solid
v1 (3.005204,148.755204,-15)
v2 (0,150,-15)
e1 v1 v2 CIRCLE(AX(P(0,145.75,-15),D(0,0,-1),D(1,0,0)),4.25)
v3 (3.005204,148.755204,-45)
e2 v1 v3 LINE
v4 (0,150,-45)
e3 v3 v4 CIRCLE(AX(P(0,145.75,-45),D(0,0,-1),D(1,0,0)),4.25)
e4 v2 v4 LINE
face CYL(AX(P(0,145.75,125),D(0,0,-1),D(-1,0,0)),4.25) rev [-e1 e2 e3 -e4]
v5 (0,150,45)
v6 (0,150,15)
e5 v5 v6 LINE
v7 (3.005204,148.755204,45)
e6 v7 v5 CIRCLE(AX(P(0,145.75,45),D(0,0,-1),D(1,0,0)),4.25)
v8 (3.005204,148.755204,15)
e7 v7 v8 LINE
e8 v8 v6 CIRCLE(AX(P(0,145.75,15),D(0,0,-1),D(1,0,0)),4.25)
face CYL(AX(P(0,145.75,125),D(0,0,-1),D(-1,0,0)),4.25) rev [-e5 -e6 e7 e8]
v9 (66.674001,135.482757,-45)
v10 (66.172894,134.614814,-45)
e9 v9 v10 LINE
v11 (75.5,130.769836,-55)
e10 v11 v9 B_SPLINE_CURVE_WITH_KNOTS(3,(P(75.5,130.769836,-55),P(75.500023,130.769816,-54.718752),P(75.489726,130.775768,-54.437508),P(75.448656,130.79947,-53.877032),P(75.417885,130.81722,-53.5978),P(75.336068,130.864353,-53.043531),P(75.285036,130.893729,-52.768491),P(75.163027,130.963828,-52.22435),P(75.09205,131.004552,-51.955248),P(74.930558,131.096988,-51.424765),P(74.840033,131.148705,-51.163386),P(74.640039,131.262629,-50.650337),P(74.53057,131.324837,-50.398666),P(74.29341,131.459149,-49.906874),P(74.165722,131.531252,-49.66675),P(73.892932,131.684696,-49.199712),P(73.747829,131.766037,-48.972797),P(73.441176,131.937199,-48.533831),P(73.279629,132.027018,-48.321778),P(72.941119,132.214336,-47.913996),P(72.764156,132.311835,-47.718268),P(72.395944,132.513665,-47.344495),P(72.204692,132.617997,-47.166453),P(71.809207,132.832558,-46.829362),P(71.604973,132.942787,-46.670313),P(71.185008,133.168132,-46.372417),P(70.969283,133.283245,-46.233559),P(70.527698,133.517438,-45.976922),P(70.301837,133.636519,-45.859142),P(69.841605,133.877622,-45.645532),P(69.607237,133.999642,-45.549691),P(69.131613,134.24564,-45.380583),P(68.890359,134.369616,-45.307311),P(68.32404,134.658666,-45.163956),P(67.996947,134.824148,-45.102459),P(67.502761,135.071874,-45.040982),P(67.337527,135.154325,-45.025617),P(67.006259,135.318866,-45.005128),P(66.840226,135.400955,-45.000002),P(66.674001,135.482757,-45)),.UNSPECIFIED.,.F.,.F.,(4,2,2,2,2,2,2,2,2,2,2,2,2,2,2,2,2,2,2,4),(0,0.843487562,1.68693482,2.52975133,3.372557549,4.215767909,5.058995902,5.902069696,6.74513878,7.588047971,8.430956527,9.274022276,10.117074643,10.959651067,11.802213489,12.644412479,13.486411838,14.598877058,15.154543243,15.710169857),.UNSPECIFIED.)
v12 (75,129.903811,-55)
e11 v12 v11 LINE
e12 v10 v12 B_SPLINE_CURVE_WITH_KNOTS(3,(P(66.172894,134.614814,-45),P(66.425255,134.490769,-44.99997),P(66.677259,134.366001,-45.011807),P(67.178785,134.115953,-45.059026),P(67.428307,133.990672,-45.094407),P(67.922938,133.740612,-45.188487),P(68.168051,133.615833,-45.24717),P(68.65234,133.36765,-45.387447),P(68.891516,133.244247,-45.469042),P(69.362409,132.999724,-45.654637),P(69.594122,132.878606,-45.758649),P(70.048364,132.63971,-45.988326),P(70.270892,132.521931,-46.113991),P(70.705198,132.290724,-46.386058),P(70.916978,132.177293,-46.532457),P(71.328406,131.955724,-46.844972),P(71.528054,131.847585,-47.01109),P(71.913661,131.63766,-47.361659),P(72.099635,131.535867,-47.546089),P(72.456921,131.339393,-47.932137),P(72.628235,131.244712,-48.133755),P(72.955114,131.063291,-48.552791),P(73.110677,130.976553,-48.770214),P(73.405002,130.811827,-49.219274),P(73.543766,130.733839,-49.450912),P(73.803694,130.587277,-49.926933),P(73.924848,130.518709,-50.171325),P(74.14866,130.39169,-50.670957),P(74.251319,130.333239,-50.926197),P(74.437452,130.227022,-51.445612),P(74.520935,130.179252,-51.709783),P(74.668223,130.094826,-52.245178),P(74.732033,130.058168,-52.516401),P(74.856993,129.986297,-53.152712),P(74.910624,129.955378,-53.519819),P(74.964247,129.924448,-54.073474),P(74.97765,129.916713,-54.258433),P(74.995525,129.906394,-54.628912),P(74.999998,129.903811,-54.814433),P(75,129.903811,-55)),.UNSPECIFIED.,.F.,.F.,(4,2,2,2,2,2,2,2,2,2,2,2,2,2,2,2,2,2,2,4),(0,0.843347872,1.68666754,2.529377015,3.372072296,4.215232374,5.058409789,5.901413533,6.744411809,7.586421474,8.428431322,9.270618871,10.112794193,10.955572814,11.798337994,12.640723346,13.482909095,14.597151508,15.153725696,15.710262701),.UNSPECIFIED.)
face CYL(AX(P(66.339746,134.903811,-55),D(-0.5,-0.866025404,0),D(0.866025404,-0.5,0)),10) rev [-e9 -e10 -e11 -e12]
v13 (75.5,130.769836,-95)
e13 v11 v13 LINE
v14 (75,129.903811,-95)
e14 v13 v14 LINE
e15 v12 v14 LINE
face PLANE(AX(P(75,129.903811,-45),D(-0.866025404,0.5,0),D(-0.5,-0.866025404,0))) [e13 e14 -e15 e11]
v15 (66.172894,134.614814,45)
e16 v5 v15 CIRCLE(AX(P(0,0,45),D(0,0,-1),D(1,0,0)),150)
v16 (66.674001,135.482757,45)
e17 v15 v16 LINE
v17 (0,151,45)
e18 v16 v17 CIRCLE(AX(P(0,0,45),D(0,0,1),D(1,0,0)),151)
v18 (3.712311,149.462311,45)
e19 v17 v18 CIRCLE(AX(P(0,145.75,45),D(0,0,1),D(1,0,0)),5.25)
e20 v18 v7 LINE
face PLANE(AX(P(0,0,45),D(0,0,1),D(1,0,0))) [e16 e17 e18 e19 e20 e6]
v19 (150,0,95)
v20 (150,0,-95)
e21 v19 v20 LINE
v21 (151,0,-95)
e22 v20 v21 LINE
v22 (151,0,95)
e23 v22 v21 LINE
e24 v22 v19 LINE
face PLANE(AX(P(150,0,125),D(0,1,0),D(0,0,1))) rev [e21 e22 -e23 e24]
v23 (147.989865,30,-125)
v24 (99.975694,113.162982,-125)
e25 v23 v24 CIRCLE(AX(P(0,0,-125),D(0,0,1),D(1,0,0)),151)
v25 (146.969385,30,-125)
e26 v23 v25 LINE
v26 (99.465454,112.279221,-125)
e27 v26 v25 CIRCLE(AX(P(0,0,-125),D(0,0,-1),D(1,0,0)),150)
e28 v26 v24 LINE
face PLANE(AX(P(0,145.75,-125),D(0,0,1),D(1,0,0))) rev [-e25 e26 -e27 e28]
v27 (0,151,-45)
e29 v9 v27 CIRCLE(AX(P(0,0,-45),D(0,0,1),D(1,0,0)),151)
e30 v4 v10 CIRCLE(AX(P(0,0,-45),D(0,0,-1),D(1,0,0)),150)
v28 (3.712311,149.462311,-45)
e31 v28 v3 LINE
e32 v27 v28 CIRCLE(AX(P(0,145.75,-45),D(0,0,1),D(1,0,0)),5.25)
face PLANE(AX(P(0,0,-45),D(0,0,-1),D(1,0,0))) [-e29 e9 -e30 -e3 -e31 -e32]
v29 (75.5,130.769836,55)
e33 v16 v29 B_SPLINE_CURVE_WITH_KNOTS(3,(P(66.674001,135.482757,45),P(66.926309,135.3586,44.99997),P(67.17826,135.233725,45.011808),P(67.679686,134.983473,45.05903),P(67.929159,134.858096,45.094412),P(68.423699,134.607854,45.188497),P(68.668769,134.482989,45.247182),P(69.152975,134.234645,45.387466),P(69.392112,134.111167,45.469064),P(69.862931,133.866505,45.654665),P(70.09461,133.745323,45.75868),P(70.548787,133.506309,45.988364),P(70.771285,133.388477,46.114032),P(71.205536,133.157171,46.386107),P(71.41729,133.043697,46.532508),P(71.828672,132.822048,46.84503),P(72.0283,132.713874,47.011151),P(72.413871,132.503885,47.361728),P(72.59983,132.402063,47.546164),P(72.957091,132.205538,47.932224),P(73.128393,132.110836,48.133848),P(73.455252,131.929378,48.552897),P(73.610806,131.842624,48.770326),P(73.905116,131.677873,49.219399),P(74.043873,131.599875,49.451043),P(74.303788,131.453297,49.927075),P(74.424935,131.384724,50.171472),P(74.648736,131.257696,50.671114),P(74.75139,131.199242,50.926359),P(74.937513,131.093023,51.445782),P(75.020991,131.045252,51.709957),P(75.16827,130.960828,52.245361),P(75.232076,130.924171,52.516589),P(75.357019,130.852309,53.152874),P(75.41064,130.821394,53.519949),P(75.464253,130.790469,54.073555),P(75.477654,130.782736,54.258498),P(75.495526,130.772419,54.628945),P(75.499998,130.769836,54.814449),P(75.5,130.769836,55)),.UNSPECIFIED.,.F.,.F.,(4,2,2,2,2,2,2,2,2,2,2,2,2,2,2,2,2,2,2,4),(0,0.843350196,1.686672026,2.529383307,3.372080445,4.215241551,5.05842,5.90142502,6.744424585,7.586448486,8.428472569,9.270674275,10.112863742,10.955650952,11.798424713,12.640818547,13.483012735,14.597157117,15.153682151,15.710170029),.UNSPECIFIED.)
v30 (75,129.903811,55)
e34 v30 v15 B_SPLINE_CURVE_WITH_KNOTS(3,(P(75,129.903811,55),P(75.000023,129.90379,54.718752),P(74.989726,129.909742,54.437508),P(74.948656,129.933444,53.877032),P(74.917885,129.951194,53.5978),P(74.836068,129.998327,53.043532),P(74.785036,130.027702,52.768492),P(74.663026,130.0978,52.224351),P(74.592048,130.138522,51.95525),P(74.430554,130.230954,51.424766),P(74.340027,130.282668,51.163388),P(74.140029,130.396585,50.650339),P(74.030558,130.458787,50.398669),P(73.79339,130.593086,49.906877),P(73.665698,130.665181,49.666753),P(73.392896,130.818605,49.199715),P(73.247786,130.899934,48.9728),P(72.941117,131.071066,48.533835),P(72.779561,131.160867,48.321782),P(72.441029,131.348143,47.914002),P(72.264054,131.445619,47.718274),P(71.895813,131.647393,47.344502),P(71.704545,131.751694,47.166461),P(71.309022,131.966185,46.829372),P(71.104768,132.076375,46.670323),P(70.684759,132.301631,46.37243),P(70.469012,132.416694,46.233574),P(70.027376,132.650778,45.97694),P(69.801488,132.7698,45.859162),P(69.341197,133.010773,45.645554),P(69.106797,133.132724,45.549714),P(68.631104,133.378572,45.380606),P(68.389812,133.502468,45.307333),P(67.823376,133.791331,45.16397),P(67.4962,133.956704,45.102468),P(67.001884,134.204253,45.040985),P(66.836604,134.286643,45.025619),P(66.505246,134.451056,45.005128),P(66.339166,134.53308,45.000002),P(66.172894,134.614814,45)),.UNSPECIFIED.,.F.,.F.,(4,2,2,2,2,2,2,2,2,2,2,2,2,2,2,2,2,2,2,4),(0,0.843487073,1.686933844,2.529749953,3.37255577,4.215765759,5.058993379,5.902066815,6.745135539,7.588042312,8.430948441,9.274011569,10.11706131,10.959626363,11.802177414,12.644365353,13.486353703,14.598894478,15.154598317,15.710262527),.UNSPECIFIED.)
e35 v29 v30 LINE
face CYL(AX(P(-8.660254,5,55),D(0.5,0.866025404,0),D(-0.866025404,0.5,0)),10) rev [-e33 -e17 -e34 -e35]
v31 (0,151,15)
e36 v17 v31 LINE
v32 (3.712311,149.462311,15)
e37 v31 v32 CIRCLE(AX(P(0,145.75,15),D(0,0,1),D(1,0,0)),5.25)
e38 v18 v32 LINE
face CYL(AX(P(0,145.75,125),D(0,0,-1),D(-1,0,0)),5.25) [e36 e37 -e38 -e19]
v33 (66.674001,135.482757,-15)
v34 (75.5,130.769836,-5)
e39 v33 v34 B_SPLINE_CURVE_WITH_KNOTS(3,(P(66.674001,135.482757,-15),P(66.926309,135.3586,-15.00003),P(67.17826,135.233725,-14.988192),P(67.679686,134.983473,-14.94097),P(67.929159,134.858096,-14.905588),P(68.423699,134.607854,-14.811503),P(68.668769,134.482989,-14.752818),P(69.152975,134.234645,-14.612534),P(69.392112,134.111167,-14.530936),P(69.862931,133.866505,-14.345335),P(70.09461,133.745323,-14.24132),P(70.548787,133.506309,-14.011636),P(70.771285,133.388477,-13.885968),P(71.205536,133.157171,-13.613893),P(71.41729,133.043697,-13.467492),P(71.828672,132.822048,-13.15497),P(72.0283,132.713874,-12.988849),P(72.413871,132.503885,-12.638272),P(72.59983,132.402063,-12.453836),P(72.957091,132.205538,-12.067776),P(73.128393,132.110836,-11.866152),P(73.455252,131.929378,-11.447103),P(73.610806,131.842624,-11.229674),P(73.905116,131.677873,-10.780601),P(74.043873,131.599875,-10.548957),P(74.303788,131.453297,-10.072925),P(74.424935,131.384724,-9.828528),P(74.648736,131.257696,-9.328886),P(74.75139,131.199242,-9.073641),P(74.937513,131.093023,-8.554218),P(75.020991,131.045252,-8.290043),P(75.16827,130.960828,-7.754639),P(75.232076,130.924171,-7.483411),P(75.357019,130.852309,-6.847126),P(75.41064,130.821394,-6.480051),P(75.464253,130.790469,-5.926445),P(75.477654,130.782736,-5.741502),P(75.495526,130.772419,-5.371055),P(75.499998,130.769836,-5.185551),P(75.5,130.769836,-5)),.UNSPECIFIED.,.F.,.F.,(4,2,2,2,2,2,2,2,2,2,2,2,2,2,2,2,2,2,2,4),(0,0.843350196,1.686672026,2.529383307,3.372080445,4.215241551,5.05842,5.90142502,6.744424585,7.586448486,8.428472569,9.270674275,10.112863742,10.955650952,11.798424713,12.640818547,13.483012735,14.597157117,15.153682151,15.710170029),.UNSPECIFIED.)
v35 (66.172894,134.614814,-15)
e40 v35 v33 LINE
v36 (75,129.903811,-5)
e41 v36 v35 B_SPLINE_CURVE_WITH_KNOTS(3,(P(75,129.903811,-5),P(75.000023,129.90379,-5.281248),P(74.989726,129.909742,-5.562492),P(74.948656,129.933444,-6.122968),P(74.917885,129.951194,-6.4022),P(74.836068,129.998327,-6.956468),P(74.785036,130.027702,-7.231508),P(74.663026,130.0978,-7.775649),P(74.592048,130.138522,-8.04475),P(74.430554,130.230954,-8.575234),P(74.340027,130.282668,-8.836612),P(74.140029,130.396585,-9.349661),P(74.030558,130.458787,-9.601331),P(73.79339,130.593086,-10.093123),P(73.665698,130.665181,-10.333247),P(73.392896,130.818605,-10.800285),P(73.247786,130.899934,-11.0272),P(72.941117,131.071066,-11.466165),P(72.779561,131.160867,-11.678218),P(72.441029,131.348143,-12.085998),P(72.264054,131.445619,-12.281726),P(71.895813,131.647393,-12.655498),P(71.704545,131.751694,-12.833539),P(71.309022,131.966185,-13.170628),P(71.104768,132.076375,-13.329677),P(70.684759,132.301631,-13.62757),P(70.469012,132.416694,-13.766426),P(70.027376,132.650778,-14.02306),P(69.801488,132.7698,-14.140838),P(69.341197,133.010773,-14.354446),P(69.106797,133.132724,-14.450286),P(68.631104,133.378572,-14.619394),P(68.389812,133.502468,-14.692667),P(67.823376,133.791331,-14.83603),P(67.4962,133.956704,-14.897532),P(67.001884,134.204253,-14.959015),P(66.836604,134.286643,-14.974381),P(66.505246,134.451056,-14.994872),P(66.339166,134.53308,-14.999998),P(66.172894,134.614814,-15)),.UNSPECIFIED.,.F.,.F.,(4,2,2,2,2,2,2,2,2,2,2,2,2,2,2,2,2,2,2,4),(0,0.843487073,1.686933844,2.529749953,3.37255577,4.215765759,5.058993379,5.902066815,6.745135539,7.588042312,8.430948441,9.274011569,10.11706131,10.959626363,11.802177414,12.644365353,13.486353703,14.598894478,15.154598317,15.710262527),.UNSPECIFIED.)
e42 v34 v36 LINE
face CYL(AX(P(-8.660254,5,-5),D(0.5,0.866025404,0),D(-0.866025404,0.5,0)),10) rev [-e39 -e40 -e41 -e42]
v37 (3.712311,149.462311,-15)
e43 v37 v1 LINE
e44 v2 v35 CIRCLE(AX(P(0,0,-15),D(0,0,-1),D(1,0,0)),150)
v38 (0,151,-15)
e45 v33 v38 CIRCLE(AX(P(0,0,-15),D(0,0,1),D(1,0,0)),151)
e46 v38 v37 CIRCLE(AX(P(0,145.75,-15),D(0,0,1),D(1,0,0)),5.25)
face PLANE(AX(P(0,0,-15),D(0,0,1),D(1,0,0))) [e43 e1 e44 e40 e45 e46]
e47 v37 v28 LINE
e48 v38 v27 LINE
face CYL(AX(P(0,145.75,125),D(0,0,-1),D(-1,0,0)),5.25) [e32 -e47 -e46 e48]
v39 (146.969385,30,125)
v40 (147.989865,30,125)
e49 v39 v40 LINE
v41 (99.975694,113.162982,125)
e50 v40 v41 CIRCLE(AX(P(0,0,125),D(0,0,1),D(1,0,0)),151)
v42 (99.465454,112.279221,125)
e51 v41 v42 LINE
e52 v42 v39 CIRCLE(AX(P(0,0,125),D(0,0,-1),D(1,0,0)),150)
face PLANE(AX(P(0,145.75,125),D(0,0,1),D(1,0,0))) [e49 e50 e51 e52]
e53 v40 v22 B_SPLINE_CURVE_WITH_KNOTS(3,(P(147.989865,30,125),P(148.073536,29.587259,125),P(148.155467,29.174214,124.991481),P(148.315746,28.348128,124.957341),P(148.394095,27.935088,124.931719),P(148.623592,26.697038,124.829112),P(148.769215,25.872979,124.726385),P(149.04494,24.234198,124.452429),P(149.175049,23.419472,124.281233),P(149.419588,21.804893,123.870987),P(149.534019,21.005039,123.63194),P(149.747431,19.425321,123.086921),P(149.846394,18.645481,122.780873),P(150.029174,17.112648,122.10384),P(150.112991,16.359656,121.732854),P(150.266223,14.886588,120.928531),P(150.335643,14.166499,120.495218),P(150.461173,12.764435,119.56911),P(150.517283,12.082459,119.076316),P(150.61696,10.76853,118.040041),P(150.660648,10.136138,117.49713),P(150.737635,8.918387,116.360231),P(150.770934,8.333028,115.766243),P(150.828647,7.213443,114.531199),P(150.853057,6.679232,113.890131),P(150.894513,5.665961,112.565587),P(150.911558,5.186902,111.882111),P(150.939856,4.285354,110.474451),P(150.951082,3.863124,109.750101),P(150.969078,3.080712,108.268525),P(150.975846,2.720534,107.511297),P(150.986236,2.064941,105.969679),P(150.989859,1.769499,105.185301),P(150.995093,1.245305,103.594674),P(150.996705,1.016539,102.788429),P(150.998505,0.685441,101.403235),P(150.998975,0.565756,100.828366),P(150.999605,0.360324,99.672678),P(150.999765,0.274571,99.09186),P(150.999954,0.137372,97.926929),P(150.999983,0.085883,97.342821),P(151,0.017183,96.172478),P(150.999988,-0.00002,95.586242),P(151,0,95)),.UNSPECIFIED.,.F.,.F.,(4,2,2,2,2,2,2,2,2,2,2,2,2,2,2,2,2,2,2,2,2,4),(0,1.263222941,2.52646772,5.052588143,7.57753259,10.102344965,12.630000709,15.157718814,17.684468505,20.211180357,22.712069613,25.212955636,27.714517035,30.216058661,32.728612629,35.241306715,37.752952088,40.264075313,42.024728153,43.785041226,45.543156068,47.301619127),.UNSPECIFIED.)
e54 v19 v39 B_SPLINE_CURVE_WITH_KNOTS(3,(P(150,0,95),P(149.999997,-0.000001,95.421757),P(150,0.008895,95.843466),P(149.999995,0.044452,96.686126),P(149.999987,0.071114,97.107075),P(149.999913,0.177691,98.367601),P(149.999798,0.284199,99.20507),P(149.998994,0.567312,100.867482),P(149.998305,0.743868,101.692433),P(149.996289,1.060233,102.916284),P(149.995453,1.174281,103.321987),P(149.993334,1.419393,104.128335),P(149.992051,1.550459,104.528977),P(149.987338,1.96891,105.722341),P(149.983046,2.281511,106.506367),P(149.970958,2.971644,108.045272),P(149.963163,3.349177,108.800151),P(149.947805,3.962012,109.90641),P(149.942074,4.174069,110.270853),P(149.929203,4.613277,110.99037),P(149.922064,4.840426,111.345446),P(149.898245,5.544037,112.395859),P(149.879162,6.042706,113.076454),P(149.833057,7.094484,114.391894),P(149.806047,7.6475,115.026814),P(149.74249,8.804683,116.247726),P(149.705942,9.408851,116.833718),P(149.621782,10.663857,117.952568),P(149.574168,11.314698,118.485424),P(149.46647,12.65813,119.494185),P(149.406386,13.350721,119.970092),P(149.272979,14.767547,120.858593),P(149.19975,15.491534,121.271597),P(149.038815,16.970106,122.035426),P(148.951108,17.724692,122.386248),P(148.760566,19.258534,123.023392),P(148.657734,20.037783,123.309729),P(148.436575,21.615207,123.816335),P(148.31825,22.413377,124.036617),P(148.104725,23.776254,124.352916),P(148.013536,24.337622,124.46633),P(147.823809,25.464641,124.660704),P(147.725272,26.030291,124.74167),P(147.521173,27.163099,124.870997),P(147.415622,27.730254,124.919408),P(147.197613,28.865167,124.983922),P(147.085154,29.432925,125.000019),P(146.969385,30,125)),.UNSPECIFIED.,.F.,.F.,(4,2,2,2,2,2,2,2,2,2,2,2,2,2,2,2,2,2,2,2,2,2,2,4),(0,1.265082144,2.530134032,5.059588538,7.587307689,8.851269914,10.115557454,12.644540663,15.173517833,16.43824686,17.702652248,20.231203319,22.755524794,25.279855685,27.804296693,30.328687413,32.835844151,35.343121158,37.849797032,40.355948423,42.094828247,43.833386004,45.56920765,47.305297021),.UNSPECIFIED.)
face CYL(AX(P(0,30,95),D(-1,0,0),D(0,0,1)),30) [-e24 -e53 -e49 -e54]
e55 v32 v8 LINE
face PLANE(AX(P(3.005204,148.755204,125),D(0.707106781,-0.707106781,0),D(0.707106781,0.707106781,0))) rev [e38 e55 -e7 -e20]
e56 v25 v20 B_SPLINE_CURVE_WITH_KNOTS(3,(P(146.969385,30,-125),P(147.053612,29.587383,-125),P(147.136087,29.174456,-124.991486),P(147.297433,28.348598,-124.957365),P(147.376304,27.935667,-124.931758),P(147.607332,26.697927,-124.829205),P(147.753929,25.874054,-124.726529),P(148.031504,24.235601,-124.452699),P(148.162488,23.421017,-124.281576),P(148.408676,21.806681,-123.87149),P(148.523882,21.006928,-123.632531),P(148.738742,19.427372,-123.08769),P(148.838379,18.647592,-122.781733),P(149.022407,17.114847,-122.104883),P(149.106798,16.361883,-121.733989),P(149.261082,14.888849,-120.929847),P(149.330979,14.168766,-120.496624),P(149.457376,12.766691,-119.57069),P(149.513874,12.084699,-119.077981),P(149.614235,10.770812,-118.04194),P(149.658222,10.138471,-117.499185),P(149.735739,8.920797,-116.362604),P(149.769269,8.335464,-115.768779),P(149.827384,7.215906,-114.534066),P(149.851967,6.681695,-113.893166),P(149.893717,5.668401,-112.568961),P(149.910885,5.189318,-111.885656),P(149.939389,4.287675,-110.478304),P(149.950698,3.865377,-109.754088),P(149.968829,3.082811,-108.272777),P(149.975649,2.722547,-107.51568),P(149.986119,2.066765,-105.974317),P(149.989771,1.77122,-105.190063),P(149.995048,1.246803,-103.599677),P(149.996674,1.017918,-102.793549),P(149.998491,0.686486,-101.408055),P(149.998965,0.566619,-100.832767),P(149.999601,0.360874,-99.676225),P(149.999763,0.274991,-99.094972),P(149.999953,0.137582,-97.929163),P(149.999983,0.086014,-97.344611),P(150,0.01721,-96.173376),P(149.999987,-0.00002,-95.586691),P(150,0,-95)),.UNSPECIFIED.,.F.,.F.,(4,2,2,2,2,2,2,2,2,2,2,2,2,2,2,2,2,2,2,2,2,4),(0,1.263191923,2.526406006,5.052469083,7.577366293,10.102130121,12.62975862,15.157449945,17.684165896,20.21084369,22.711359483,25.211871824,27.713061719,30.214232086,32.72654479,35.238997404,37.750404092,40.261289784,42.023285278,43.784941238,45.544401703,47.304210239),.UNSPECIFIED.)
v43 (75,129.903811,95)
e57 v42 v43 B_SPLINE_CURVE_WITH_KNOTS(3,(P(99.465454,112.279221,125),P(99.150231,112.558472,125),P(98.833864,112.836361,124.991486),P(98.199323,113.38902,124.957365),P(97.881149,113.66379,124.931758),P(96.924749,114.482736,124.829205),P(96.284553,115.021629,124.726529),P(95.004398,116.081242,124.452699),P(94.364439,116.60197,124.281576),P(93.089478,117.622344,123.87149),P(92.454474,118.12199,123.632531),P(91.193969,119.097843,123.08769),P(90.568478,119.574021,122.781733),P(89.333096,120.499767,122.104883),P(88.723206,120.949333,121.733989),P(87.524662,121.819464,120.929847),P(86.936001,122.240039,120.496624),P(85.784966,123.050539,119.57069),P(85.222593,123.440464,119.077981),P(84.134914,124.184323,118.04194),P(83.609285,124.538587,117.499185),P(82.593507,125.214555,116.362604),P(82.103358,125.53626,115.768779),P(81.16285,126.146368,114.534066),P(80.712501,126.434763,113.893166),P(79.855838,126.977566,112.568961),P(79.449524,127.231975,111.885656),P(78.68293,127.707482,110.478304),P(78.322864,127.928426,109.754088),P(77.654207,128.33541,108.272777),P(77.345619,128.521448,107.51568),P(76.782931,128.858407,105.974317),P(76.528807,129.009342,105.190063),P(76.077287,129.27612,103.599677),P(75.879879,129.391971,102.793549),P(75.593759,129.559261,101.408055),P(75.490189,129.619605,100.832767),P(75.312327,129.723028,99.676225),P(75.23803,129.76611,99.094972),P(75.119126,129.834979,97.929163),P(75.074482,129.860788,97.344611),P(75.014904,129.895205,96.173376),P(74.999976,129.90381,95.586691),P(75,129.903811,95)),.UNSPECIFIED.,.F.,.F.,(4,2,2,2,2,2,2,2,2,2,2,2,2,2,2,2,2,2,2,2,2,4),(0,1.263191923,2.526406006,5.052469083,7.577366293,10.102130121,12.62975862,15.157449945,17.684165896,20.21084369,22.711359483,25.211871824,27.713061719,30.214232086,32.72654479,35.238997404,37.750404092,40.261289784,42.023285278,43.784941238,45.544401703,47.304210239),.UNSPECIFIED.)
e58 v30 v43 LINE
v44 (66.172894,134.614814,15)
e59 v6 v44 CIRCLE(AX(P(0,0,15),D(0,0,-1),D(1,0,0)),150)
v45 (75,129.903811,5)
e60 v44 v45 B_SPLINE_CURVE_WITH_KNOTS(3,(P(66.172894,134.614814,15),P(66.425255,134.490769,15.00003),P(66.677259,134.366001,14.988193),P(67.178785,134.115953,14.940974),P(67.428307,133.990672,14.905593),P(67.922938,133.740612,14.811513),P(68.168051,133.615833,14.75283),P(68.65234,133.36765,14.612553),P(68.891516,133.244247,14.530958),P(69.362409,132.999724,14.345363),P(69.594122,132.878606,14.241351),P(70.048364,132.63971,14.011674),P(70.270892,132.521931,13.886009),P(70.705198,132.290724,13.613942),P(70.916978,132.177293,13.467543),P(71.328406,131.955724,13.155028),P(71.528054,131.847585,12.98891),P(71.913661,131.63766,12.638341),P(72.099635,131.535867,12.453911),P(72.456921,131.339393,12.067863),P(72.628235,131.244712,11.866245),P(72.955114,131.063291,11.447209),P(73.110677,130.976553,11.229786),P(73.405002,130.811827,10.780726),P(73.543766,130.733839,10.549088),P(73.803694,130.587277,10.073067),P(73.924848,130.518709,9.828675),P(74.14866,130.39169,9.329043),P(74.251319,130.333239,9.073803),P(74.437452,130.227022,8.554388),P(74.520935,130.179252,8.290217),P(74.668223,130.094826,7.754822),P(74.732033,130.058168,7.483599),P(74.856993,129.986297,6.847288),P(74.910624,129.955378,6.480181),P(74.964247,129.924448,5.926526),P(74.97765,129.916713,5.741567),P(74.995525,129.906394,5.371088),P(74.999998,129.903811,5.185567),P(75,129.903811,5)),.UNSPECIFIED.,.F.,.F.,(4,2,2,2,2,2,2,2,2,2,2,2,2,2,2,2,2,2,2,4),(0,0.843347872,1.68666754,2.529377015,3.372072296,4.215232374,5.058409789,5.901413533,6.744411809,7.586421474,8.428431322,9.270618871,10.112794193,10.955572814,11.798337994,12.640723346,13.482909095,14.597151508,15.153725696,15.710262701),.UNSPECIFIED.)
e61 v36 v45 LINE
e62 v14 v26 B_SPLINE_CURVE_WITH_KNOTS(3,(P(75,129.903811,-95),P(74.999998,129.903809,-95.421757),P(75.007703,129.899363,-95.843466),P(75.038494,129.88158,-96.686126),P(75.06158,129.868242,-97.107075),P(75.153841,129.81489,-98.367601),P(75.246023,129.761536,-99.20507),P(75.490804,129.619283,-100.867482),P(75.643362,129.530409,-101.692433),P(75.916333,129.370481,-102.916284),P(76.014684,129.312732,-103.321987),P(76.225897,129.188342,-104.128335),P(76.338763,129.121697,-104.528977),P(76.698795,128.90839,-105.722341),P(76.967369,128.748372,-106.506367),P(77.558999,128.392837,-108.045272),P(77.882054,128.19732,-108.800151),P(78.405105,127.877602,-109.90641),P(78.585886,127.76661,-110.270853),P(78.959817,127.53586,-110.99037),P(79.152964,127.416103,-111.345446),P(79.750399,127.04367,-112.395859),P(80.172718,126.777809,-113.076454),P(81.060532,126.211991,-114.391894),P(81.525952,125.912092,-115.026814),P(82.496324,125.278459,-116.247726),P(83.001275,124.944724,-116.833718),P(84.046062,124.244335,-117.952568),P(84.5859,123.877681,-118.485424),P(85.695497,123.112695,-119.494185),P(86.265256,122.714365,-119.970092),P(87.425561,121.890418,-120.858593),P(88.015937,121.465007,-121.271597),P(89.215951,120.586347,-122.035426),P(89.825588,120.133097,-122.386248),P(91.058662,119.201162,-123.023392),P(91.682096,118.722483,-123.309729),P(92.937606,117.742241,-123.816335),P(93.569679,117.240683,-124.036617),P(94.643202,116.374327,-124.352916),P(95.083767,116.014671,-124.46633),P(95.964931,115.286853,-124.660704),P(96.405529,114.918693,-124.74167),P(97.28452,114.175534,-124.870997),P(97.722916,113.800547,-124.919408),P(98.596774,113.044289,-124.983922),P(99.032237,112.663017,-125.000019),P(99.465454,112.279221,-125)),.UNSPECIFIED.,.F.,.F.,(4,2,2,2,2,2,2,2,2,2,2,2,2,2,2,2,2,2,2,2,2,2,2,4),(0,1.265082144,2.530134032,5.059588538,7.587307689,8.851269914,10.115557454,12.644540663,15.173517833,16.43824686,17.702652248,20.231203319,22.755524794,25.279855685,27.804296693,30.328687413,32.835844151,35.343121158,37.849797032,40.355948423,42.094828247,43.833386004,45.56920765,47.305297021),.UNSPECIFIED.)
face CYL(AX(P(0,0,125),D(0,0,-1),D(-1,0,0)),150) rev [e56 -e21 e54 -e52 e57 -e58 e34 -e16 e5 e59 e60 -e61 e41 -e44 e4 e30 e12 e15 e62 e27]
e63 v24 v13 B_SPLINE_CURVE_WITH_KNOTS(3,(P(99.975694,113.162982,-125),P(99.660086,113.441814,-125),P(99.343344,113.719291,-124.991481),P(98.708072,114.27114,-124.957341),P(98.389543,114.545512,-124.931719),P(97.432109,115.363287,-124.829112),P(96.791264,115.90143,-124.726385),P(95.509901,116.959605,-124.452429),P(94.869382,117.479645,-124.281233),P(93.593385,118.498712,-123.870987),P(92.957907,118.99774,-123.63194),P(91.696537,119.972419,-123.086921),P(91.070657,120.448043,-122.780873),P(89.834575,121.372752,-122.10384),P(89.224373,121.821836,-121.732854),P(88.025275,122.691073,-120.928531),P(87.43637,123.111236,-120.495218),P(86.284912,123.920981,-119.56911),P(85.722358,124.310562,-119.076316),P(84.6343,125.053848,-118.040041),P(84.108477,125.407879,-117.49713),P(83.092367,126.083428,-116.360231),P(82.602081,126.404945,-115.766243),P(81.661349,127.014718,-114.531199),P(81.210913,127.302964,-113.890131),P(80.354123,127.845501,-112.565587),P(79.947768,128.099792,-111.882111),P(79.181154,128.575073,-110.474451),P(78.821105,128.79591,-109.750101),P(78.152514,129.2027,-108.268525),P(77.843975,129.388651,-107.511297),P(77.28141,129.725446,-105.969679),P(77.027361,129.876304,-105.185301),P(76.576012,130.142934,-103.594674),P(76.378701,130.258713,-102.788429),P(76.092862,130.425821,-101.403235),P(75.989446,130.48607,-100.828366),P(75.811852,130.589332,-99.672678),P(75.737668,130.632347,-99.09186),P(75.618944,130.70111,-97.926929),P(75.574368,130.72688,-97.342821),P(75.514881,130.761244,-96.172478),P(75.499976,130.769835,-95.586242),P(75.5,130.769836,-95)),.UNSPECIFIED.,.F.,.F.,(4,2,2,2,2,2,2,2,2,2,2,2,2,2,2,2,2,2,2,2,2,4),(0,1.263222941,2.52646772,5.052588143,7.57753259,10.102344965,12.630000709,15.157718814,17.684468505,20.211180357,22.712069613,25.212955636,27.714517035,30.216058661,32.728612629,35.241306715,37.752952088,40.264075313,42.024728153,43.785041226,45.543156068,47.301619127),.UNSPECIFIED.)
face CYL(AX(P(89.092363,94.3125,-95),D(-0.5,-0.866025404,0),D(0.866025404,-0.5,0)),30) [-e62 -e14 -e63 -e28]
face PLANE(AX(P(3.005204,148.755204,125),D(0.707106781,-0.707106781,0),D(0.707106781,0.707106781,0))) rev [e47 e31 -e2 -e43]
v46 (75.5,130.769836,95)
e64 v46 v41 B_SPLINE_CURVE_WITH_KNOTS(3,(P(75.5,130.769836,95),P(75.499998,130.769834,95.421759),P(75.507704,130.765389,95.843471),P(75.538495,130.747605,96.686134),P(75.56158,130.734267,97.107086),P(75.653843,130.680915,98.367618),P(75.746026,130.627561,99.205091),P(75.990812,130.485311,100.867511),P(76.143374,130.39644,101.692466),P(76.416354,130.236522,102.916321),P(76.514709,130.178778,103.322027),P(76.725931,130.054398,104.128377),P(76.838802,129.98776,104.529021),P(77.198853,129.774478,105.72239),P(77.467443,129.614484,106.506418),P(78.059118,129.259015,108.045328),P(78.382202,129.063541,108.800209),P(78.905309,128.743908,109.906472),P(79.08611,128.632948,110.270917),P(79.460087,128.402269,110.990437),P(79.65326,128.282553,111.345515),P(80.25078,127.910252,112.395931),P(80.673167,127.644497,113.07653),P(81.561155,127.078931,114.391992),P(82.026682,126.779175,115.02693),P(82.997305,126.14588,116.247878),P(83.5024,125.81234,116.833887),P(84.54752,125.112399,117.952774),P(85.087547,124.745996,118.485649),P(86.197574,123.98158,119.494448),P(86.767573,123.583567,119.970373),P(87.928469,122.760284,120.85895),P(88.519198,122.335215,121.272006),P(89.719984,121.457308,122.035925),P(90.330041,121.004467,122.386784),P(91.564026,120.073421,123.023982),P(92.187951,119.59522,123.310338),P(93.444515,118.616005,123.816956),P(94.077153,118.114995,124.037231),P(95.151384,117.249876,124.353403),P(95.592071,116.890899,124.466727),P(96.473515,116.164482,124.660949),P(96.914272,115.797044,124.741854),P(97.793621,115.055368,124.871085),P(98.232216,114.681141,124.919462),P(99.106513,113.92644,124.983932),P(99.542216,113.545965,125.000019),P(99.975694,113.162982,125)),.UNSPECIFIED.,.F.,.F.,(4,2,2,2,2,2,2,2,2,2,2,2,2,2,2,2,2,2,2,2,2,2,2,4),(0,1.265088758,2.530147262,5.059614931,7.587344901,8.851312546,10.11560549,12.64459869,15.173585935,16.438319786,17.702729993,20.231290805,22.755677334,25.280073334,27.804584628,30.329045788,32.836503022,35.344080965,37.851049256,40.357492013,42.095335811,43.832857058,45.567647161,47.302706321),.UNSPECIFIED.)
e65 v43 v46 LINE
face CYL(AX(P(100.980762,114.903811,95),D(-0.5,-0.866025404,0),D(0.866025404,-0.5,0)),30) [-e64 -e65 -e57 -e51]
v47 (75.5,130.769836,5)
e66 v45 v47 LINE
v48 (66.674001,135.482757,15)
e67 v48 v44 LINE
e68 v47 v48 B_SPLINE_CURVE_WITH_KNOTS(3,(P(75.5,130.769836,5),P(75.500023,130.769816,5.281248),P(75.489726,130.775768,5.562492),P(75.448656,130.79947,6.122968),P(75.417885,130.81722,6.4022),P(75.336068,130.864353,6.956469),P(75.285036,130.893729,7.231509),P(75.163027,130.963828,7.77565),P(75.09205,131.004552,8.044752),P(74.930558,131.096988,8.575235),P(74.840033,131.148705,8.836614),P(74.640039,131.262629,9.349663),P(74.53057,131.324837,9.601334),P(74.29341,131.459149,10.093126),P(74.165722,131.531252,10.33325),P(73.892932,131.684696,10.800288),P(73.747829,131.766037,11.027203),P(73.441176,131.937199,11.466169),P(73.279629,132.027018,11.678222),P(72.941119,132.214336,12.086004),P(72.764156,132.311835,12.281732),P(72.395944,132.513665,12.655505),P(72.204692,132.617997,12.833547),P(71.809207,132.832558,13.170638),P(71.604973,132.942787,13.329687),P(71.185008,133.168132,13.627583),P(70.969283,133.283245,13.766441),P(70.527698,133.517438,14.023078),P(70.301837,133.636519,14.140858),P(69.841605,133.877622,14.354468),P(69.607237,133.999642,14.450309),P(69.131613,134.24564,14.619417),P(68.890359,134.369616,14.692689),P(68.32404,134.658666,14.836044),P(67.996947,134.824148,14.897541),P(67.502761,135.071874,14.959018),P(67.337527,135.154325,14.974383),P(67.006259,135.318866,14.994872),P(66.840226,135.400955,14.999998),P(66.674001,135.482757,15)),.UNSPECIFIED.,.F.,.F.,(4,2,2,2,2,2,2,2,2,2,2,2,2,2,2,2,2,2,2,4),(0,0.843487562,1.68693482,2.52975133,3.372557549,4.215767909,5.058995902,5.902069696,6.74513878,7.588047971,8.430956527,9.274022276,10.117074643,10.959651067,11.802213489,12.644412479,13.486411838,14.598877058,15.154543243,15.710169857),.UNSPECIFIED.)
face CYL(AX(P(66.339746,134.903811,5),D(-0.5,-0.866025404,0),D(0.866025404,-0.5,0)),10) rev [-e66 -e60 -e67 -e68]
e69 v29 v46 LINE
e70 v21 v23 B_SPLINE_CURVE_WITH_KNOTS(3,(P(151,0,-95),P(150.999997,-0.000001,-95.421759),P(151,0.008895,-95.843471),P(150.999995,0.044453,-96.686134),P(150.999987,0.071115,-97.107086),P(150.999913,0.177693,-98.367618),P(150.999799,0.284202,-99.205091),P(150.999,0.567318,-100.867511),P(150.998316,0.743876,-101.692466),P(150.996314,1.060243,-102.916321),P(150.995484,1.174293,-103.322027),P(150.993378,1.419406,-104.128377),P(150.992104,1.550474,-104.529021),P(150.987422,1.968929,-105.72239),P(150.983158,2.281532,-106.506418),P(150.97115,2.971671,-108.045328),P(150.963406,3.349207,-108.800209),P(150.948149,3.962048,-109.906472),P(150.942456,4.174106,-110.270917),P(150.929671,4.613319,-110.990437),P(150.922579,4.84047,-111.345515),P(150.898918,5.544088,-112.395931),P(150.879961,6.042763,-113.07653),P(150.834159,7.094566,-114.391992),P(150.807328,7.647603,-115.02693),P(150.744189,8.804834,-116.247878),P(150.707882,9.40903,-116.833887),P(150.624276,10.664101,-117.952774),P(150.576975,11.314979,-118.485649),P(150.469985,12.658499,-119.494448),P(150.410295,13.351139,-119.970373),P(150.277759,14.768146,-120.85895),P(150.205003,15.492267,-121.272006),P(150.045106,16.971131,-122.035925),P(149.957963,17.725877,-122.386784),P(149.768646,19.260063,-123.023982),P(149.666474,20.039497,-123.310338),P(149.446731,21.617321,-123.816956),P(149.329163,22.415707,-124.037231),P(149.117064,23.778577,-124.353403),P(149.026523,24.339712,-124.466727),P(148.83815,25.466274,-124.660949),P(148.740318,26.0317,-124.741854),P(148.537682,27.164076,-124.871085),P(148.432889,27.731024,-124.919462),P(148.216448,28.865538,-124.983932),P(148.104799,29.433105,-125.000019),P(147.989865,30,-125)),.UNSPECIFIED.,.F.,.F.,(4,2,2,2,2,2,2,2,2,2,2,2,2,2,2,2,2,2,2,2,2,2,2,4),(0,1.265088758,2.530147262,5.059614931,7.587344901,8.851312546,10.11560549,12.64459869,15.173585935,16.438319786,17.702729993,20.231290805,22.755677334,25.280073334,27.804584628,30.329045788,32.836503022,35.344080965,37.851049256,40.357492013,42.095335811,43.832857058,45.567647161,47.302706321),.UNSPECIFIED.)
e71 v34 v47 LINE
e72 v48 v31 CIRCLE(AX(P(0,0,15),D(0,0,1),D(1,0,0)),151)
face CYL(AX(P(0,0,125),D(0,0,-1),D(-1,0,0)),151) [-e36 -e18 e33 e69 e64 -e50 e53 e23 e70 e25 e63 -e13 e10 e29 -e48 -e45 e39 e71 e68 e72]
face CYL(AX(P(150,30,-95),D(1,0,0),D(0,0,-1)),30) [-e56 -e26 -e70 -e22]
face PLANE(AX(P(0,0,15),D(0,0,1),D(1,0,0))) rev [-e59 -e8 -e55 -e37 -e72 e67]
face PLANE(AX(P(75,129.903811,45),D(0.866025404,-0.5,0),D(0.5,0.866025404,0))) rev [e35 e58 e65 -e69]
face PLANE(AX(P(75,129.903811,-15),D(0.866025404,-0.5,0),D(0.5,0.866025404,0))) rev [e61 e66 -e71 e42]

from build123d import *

# Parameters (mm, degrees)
BOSS_EXTRUDE1_DEPTH = 125
CUT_EXTRUDE1_DEPTH  = 15
CUT_EXTRUDE2_DEPTH  = 80
FILLET1_START       = 83.934299194
FILLET1_DEPTH       = 68.065700806
FILLET1_START_2     = 78.711006452
FILLET1_2_DEPTH     = 73.288993548
FILLET2_R           = 10


with BuildPart() as part:
    # Sketch2 → Boss-Extrude1 (new, symmetric)
    with BuildSketch(Plane.XY):
        with BuildLine():
            Line((3.00520382, 148.75520382), (3.712310601, 149.462310601))
            ThreePointArc((3.712310601, 149.462310601), (-2.00908802, 140.899632454), (0, 151))
            ThreePointArc((0, 151), (106.773123959, 106.773123959), (151, 0))
            Line((151, 0), (150, 0))
            ThreePointArc((150, 0), (106.066017178, 106.066017178), (0, 150))
            ThreePointArc((0, 150), (-1.626404588, 141.823511987), (3.00520382, 148.75520382))
        make_face()
    extrude(amount=BOSS_EXTRUDE1_DEPTH, both=True)

    # Sketch3 → Cut-Extrude1 (cut, symmetric)
    with BuildSketch(Plane.XY):
        with BuildLine():
            Line((75, 129.903810568), (75.5, 130.769835971))
            ThreePointArc((75.5, 130.769835971), (39.08167581, 145.85479977), (0, 151))
            ThreePointArc((0, 151), (-2.00908802, 140.899632454), (3.712310601, 149.462310601))
            Line((3.712310601, 149.462310601), (3.00520382, 148.75520382))
            ThreePointArc((3.00520382, 148.75520382), (-1.626404588, 141.823511987), (0, 150))
            ThreePointArc((0, 150), (38.822856765, 144.888873943), (75, 129.903810568))
        make_face()
    extrude(amount=CUT_EXTRUDE1_DEPTH, both=True, mode=Mode.SUBTRACT)

    # Sketch4 → Cut-Extrude2 (cut)
    with BuildSketch(Plane.XY.offset(125)):
        with BuildLine():
            Line((75, 129.903810568), (75.5, 130.769835971))
            ThreePointArc((75.5, 130.769835971), (39.08167581, 145.85479977), (0, 151))
            ThreePointArc((0, 151), (-2.00908802, 140.899632454), (3.712310601, 149.462310601))
            Line((3.712310601, 149.462310601), (3.00520382, 148.75520382))
            ThreePointArc((3.00520382, 148.75520382), (-1.626404588, 141.823511987), (0, 150))
            ThreePointArc((0, 150), (38.822856765, 144.888873943), (75, 129.903810568))
        make_face()
    cut_extrude2 = extrude(amount=-CUT_EXTRUDE2_DEPTH, mode=Mode.SUBTRACT)

    # Mirror1: Cut-Extrude2 across plane
    add(cut_extrude2.mirror(Plane.XY), mode=Mode.SUBTRACT)

    # Fillet1: read off the stored shape, not the designer's step
    # Fillet1 outline → Fillet1 (cut)
    with BuildSketch(Plane(origin=(0, 0, 0), x_dir=(0.8660254037844386, -0.4999999999999999, 0), z_dir=(0.4999999999999999, 0.8660254037844388, 0)).offset(FILLET1_START)):
        with BuildLine():
            Line((0, 125), (0, 95))
            ThreePointArc((0, 95), (8.786796564, 116.213203436), (30, 125))
            Line((30, 125), (0, 125))
        make_face()
        with BuildLine():
            Line((0, -125), (30, -125))
            ThreePointArc((30, -125), (8.786796564, -116.213203436), (0, -95))
            Line((0, -95), (0, -125))
        make_face()
    extrude(amount=FILLET1_DEPTH, mode=Mode.SUBTRACT)

    # Fillet1 2 outline → Fillet1 2 (cut)
    with BuildSketch(Plane.YZ.offset(FILLET1_START_2)):
        with BuildLine():
            ThreePointArc((30, -125), (8.786796564, -116.213203436), (0, -95))
            Line((0, -95), (0, -125))
            Line((0, -125), (30, -125))
        make_face()
        with BuildLine():
            Line((0, 125), (0, 95))
            ThreePointArc((0, 95), (8.786796564, 116.213203436), (30, 125))
            Line((30, 125), (0, 125))
        make_face()
    extrude(amount=FILLET1_2_DEPTH, mode=Mode.SUBTRACT)

    # Fillet2
    fillet2_edges = [part.edges().sort_by_distance(p)[0] for p in [
        (75.25, 130.33682327, -15),
        (75.25, 130.33682327, 15),
        (75.25, 130.33682327, 45),
        (75.25, 130.33682327, -45),
    ]]
    fillet(fillet2_edges, radius=FILLET2_R)


solid = part.part
